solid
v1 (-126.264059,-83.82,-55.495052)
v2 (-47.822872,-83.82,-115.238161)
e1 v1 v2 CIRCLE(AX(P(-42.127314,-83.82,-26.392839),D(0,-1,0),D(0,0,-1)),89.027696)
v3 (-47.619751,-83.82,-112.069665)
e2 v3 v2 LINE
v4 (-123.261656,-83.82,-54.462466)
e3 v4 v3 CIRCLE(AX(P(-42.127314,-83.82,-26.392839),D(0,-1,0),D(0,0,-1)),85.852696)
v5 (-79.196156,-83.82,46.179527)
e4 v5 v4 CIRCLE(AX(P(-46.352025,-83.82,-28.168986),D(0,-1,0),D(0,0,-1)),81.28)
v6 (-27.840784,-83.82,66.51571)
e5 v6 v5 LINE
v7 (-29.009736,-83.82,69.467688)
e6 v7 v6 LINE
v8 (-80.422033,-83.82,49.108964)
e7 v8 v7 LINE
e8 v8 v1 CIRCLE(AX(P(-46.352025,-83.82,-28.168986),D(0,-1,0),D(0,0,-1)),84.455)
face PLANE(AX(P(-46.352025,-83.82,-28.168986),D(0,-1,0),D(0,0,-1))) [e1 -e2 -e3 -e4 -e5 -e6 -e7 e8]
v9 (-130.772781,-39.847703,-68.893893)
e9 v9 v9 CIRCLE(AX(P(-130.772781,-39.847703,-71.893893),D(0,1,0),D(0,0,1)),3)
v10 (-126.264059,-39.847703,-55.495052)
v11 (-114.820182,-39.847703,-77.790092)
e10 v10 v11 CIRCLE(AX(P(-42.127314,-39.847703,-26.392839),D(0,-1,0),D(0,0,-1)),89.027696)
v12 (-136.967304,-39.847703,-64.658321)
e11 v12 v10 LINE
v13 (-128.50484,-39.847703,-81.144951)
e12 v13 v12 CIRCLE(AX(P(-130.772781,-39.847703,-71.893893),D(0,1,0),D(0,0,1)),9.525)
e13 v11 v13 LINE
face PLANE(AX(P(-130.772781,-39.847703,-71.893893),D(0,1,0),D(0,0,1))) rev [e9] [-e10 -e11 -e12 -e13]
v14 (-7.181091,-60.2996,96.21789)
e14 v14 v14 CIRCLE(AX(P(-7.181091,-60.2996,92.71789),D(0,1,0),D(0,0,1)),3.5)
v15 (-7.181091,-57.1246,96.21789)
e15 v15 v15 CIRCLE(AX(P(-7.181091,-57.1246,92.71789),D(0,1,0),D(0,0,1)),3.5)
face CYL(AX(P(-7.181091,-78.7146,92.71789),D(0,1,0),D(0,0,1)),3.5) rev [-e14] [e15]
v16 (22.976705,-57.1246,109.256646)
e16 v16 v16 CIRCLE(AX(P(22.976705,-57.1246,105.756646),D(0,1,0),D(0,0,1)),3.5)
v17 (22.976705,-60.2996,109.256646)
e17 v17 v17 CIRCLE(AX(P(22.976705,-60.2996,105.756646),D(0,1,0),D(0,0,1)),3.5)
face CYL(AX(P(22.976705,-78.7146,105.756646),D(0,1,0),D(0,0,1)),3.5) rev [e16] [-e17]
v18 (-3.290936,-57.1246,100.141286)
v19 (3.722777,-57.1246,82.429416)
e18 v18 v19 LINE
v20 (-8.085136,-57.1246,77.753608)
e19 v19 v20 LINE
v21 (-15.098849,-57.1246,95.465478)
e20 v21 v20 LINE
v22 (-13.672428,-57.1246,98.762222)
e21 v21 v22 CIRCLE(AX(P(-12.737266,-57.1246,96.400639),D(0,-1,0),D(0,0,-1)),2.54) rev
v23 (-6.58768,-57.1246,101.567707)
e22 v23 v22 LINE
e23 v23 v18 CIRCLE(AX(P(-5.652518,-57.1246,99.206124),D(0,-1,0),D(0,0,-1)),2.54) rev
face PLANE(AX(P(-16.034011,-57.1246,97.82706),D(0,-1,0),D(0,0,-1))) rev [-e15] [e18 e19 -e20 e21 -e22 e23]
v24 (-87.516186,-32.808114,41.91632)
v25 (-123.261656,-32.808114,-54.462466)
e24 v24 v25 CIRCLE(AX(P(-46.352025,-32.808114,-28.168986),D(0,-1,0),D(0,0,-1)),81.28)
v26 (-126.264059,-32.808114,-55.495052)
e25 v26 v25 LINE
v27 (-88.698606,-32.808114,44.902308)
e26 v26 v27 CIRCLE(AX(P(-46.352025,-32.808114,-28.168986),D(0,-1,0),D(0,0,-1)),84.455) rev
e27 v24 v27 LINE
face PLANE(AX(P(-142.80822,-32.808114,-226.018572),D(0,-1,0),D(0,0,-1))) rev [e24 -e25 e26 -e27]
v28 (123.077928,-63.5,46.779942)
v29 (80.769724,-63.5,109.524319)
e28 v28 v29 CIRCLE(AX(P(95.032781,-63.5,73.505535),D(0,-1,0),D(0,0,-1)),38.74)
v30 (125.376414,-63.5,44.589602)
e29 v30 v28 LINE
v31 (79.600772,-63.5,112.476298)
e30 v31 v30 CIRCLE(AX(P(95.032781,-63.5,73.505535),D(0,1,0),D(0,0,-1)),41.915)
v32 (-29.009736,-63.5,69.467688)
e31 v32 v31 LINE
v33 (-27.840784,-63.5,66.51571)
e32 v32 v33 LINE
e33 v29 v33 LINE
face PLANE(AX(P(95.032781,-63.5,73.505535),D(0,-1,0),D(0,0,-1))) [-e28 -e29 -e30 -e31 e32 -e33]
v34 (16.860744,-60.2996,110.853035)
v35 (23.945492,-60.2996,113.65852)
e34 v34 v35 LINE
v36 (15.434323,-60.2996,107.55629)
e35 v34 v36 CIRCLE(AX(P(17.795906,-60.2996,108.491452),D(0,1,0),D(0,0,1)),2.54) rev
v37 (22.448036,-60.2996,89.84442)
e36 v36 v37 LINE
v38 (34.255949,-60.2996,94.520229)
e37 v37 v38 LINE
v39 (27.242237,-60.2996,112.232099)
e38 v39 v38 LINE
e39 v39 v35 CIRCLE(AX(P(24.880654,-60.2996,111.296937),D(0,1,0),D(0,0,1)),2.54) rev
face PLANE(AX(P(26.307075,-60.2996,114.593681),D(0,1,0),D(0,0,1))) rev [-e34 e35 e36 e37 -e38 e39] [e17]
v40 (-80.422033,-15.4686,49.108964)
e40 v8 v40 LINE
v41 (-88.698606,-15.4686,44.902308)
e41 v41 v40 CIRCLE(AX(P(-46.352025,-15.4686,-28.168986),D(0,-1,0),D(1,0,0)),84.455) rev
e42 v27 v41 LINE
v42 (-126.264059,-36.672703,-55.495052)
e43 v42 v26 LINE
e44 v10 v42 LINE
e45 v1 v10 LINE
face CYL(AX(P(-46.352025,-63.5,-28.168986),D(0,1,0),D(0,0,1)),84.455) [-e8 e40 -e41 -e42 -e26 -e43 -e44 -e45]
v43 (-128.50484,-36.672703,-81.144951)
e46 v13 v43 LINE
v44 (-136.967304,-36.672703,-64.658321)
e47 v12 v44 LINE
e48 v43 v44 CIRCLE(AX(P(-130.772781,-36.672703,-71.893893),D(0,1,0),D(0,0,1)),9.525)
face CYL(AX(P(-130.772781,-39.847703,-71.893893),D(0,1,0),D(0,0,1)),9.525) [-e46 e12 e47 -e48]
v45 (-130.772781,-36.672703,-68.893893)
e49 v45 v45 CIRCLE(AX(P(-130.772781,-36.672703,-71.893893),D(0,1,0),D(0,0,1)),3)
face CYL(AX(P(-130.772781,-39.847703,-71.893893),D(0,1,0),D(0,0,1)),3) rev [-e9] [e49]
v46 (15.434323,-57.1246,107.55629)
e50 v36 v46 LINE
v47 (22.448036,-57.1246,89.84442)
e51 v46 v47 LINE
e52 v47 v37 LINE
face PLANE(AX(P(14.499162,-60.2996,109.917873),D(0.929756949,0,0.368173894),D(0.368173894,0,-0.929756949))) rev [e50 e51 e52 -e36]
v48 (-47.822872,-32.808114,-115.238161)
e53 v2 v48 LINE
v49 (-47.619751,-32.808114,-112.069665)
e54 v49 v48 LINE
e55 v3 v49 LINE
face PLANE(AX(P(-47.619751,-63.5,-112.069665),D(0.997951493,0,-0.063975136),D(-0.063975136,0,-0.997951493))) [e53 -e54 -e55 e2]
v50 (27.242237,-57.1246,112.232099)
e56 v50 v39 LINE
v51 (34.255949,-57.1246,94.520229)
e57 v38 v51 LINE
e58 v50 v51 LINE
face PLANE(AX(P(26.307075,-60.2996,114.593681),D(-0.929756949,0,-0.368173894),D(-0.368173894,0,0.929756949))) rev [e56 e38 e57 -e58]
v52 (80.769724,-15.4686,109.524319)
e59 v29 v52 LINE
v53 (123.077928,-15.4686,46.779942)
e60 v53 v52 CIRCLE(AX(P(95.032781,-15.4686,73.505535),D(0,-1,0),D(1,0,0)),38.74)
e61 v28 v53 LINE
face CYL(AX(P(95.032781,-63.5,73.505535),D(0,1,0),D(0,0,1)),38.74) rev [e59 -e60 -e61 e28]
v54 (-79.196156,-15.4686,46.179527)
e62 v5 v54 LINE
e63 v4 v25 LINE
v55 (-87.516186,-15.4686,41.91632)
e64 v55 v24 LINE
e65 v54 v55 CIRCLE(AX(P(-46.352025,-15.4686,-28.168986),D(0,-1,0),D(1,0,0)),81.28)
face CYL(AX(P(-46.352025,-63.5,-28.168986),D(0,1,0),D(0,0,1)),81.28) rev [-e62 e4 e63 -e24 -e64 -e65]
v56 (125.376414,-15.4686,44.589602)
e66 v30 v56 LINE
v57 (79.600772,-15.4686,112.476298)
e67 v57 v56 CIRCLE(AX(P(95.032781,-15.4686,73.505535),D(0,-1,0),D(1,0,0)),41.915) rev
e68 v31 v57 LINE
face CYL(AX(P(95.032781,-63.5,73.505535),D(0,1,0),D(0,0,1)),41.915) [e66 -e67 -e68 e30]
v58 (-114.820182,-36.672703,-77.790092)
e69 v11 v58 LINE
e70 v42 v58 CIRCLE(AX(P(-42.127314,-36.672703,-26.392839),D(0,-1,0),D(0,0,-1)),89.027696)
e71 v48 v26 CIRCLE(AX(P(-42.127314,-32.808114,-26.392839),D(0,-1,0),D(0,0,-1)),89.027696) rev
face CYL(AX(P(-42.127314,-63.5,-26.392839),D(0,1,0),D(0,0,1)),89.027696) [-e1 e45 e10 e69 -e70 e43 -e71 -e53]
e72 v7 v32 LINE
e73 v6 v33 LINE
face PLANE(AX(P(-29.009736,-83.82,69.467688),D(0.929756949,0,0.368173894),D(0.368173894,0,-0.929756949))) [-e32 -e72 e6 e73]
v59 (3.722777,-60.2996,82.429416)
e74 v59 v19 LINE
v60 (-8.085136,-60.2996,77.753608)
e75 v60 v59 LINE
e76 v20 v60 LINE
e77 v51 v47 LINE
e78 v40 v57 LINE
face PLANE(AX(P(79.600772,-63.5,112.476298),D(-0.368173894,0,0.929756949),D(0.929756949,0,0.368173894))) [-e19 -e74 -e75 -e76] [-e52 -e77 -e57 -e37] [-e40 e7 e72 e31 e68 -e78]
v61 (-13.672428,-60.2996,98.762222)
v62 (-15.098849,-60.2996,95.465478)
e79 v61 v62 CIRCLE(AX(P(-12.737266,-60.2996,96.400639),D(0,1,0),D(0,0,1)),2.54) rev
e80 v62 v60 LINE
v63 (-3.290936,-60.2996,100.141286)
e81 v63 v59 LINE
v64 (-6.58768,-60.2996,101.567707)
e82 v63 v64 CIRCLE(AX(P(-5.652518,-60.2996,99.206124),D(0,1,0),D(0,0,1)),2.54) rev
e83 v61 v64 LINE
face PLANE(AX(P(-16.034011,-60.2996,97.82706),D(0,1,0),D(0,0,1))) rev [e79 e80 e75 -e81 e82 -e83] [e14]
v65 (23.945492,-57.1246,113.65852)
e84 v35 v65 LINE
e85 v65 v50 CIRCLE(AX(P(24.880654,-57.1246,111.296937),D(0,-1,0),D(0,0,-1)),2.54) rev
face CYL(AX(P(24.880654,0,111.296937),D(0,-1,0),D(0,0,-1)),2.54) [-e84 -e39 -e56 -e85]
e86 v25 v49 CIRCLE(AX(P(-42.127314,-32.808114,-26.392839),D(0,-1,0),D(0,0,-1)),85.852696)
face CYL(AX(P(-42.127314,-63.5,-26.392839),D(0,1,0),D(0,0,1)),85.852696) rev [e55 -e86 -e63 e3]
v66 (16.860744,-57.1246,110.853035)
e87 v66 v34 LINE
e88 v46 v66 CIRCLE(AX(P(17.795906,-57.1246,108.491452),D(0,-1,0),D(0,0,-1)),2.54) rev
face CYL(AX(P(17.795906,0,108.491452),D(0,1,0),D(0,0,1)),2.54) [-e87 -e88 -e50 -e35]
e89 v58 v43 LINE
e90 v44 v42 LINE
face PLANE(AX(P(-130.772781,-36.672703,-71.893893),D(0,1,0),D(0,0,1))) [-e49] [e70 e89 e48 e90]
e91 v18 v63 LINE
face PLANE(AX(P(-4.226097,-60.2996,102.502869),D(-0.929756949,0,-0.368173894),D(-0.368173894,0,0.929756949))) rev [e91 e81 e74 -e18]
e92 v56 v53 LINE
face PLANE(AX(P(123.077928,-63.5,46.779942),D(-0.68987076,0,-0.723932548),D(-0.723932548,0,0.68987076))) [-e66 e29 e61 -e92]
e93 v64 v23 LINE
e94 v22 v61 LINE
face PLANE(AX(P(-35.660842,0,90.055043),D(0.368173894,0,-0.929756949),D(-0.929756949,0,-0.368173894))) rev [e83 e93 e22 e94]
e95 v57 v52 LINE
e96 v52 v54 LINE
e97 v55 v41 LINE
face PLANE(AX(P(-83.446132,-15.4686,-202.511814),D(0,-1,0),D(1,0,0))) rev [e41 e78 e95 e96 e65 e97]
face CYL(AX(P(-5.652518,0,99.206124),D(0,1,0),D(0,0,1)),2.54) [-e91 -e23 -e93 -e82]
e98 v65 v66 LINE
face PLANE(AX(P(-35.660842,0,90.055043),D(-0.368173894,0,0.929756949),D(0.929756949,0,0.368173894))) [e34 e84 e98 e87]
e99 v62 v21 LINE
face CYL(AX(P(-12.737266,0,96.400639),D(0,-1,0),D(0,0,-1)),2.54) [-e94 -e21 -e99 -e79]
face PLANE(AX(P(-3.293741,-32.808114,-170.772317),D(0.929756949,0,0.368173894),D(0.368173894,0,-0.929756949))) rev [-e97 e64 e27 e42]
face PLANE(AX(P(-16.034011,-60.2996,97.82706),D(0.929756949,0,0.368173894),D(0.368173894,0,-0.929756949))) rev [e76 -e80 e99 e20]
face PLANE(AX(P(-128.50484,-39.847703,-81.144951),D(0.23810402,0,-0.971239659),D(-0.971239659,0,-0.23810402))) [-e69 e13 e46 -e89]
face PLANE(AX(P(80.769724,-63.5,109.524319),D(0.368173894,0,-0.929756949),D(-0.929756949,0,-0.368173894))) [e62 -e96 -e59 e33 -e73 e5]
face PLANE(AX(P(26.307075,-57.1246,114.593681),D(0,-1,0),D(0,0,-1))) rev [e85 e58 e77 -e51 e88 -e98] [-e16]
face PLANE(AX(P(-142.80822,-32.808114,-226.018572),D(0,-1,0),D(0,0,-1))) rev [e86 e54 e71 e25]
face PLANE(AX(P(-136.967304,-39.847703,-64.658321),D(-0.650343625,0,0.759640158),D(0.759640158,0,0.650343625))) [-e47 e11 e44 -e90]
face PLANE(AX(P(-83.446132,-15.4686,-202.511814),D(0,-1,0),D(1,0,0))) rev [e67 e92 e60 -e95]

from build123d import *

# Parameters (mm, degrees)
BASE_FLANGE2_DEPTH  = 63.5
SKETCH8_W           = 331.965977541
SKETCH8_H           = 30.9372
CUT_EXTRUDE1_DEPTH  = 256.834789278
SKETCH9_W           = 150.054784792
SKETCH9_H           = 34.679027416
CUT_EXTRUDE2_DEPTH  = 256.834789278
BOSS_EXTRUDE1_DEPTH = 20.32
SKETCH12_W          = 12.7
SKETCH12_H          = 3.175
BOSS_EXTRUDE2_DEPTH = 21.59
SKETCH13_R          = 3.5
CUT_EXTRUDE5_DEPTH  = 21.59
FILLET1_R           = 2.54
SKETCH14_R          = 3
BOSS_EXTRUDE3_DEPTH = 3.175


# Sheet-metal steps are written as plain solids
with BuildPart() as part:
    # Sketch1 → Base-Flange2 (new body)
    with BuildSketch(Plane(origin=(0, 0, 0), x_dir=(1, 0, 0), z_dir=(0, 1, 0))):
        with BuildLine():
            Line((80.769724328, -109.524319493), (-79.196155859, -46.179527064))
            ThreePointArc((-79.196155859, -46.179527064), (-120.807882744, -4.431069312), (-123.261655777, 54.4624663))
            ThreePointArc((-123.261655777, 54.4624663), (-94.143629301, 94.693559024), (-47.619751411, 112.069665426))
            Line((-47.619751411, 112.069665426), (-47.822872467, 115.238161415))
            ThreePointArc((-47.822872467, 115.238161415), (-96.069602275, 97.217694761), (-126.264058949, 55.495051727))
            ThreePointArc((-126.264058949, 55.495051727), (-123.704959468, -5.730431564), (-80.422032808, -49.108963745))
            Line((-80.422032808, -49.108963745), (79.600772216, -112.476297806))
            ThreePointArc((79.600772216, -112.476297806), (129.785334621, -96.938999369), (125.376413714, -44.589602401))
            Line((125.376413714, -44.589602401), (123.077927873, -46.779942064))
            ThreePointArc((123.077927873, -46.779942064), (127.152879464, -95.163948708), (80.769724328, -109.524319493))
        make_face()
    extrude(amount=-BASE_FLANGE2_DEPTH)

    # Sketch8 → Cut-Extrude1 (cut, through all)
    with BuildSketch(Plane(origin=(-27.711967852, 0, 69.98159058), x_dir=(0.9297569489485495, 0, 0.36817389353657926), z_dir=(-0.36817389353657926, 0, 0.9297569489485495))):
        with Locations((13.838804259, 0)):
            Rectangle(SKETCH8_W, SKETCH8_H)
    extrude(amount=-CUT_EXTRUDE1_DEPTH, mode=Mode.SUBTRACT)

    # Sketch9 → Cut-Extrude2 (cut, through all)
    with BuildSketch(Plane(origin=(-27.711967852, 0, 69.98159058), x_dir=(0.9297569489485495, 0, 0.36817389353657926), z_dir=(-0.36817389353657926, 0, 0.9297569489485495))):
        with Locations((-140.963680017, -15.4686)):
            Rectangle(SKETCH9_W, SKETCH9_H)
    extrude(amount=-CUT_EXTRUDE2_DEPTH, mode=Mode.SUBTRACT)

    # Sketch11 → Boss-Extrude1 (add)
    with BuildSketch(Plane.XZ.offset(63.5)):
        with BuildLine():
            Line((-47.619751411, -112.069665426), (-47.822872467, -115.238161415))
            ThreePointArc((-47.822872467, -115.238161415), (-96.069602275, -97.217694761), (-126.264058949, -55.495051727))
            ThreePointArc((-126.264058949, -55.495051727), (-123.704959468, 5.730431564), (-80.422032808, 49.108963745))
            Line((-80.422032808, 49.108963745), (-29.009735812, 69.467688228))
            Line((-29.009735812, 69.467688228), (-27.8407837, 66.515709916))
            Line((-27.8407837, 66.515709916), (-79.196155859, 46.179527064))
            ThreePointArc((-79.196155859, 46.179527064), (-120.807882744, 4.431069312), (-123.261655777, -54.4624663))
            ThreePointArc((-123.261655777, -54.4624663), (-94.143629301, -94.693559024), (-47.619751411, -112.069665426))
        make_face()
    extrude(amount=BOSS_EXTRUDE1_DEPTH)

    # Sketch12 → Boss-Extrude2 (add)
    with BuildSketch(Plane(origin=(-27.711967852, 0, 69.98159058), x_dir=(0.9297569489485495, 0, 0.3681738935365793), z_dir=(-0.36817389353657937, 0, 0.9297569489485495))):
        with Locations((27.459636868, -58.7121)):
            Rectangle(SKETCH12_W, SKETCH12_H)
        with Locations((60.299587615, -58.7121)):
            Rectangle(SKETCH12_W, SKETCH12_H)
    extrude(amount=BOSS_EXTRUDE2_DEPTH)

    # Sketch13 → Cut-Extrude5 (cut)
    with BuildSketch(Plane(origin=(0, -57.1246, 0), x_dir=(1, 0, 0), z_dir=(0, 1, 0))):
        with Locations(Location((22.976705445, -105.756645834, 0), (0, 0, 270))):
            Circle(SKETCH13_R)
        with Locations(Location((-7.181091285, -92.717889538, 0), (0, 0, 270))):
            Circle(SKETCH13_R)
    extrude(amount=-CUT_EXTRUDE5_DEPTH, mode=Mode.SUBTRACT)

    # Fillet1
    fillet1_edges = [part.edges().sort_by_distance(p)[0] for p in [
        (-4.226097394, -58.7121, 102.502868753),
        (-16.034010646, -58.7121, 97.827060305),
        (26.307075016, -58.7121, 114.593681283),
        (14.499161765, -58.7121, 109.917872835),
    ]]
    fillet(fillet1_edges, radius=FILLET1_R)

    # Sketch14 → Boss-Extrude3 (add)
    with BuildSketch(Plane(origin=(0, -36.672703388, 0), x_dir=(1, 0, 0), z_dir=(0, 1, 0))):
        with BuildLine():
            Line((-136.967303974, 64.658320793), (-126.264058949, 55.495051727))
            ThreePointArc((-126.264058949, 55.495051727), (-121.330527713, 67.047255445), (-114.82018179, 77.790091998))
            Line((-114.82018179, 77.790091998), (-128.504840161, 81.144951055))
            ThreePointArc((-128.504840161, 81.144951055), (-139.246667683, 76.243475882), (-136.967303974, 64.658320793))
        make_face()
        with Locations(Location((-130.77278095, 71.8938933, 0), (0, 0, 270))):
            Circle(SKETCH14_R, mode=Mode.SUBTRACT)
    extrude(amount=-BOSS_EXTRUDE3_DEPTH)


solid = part.part
